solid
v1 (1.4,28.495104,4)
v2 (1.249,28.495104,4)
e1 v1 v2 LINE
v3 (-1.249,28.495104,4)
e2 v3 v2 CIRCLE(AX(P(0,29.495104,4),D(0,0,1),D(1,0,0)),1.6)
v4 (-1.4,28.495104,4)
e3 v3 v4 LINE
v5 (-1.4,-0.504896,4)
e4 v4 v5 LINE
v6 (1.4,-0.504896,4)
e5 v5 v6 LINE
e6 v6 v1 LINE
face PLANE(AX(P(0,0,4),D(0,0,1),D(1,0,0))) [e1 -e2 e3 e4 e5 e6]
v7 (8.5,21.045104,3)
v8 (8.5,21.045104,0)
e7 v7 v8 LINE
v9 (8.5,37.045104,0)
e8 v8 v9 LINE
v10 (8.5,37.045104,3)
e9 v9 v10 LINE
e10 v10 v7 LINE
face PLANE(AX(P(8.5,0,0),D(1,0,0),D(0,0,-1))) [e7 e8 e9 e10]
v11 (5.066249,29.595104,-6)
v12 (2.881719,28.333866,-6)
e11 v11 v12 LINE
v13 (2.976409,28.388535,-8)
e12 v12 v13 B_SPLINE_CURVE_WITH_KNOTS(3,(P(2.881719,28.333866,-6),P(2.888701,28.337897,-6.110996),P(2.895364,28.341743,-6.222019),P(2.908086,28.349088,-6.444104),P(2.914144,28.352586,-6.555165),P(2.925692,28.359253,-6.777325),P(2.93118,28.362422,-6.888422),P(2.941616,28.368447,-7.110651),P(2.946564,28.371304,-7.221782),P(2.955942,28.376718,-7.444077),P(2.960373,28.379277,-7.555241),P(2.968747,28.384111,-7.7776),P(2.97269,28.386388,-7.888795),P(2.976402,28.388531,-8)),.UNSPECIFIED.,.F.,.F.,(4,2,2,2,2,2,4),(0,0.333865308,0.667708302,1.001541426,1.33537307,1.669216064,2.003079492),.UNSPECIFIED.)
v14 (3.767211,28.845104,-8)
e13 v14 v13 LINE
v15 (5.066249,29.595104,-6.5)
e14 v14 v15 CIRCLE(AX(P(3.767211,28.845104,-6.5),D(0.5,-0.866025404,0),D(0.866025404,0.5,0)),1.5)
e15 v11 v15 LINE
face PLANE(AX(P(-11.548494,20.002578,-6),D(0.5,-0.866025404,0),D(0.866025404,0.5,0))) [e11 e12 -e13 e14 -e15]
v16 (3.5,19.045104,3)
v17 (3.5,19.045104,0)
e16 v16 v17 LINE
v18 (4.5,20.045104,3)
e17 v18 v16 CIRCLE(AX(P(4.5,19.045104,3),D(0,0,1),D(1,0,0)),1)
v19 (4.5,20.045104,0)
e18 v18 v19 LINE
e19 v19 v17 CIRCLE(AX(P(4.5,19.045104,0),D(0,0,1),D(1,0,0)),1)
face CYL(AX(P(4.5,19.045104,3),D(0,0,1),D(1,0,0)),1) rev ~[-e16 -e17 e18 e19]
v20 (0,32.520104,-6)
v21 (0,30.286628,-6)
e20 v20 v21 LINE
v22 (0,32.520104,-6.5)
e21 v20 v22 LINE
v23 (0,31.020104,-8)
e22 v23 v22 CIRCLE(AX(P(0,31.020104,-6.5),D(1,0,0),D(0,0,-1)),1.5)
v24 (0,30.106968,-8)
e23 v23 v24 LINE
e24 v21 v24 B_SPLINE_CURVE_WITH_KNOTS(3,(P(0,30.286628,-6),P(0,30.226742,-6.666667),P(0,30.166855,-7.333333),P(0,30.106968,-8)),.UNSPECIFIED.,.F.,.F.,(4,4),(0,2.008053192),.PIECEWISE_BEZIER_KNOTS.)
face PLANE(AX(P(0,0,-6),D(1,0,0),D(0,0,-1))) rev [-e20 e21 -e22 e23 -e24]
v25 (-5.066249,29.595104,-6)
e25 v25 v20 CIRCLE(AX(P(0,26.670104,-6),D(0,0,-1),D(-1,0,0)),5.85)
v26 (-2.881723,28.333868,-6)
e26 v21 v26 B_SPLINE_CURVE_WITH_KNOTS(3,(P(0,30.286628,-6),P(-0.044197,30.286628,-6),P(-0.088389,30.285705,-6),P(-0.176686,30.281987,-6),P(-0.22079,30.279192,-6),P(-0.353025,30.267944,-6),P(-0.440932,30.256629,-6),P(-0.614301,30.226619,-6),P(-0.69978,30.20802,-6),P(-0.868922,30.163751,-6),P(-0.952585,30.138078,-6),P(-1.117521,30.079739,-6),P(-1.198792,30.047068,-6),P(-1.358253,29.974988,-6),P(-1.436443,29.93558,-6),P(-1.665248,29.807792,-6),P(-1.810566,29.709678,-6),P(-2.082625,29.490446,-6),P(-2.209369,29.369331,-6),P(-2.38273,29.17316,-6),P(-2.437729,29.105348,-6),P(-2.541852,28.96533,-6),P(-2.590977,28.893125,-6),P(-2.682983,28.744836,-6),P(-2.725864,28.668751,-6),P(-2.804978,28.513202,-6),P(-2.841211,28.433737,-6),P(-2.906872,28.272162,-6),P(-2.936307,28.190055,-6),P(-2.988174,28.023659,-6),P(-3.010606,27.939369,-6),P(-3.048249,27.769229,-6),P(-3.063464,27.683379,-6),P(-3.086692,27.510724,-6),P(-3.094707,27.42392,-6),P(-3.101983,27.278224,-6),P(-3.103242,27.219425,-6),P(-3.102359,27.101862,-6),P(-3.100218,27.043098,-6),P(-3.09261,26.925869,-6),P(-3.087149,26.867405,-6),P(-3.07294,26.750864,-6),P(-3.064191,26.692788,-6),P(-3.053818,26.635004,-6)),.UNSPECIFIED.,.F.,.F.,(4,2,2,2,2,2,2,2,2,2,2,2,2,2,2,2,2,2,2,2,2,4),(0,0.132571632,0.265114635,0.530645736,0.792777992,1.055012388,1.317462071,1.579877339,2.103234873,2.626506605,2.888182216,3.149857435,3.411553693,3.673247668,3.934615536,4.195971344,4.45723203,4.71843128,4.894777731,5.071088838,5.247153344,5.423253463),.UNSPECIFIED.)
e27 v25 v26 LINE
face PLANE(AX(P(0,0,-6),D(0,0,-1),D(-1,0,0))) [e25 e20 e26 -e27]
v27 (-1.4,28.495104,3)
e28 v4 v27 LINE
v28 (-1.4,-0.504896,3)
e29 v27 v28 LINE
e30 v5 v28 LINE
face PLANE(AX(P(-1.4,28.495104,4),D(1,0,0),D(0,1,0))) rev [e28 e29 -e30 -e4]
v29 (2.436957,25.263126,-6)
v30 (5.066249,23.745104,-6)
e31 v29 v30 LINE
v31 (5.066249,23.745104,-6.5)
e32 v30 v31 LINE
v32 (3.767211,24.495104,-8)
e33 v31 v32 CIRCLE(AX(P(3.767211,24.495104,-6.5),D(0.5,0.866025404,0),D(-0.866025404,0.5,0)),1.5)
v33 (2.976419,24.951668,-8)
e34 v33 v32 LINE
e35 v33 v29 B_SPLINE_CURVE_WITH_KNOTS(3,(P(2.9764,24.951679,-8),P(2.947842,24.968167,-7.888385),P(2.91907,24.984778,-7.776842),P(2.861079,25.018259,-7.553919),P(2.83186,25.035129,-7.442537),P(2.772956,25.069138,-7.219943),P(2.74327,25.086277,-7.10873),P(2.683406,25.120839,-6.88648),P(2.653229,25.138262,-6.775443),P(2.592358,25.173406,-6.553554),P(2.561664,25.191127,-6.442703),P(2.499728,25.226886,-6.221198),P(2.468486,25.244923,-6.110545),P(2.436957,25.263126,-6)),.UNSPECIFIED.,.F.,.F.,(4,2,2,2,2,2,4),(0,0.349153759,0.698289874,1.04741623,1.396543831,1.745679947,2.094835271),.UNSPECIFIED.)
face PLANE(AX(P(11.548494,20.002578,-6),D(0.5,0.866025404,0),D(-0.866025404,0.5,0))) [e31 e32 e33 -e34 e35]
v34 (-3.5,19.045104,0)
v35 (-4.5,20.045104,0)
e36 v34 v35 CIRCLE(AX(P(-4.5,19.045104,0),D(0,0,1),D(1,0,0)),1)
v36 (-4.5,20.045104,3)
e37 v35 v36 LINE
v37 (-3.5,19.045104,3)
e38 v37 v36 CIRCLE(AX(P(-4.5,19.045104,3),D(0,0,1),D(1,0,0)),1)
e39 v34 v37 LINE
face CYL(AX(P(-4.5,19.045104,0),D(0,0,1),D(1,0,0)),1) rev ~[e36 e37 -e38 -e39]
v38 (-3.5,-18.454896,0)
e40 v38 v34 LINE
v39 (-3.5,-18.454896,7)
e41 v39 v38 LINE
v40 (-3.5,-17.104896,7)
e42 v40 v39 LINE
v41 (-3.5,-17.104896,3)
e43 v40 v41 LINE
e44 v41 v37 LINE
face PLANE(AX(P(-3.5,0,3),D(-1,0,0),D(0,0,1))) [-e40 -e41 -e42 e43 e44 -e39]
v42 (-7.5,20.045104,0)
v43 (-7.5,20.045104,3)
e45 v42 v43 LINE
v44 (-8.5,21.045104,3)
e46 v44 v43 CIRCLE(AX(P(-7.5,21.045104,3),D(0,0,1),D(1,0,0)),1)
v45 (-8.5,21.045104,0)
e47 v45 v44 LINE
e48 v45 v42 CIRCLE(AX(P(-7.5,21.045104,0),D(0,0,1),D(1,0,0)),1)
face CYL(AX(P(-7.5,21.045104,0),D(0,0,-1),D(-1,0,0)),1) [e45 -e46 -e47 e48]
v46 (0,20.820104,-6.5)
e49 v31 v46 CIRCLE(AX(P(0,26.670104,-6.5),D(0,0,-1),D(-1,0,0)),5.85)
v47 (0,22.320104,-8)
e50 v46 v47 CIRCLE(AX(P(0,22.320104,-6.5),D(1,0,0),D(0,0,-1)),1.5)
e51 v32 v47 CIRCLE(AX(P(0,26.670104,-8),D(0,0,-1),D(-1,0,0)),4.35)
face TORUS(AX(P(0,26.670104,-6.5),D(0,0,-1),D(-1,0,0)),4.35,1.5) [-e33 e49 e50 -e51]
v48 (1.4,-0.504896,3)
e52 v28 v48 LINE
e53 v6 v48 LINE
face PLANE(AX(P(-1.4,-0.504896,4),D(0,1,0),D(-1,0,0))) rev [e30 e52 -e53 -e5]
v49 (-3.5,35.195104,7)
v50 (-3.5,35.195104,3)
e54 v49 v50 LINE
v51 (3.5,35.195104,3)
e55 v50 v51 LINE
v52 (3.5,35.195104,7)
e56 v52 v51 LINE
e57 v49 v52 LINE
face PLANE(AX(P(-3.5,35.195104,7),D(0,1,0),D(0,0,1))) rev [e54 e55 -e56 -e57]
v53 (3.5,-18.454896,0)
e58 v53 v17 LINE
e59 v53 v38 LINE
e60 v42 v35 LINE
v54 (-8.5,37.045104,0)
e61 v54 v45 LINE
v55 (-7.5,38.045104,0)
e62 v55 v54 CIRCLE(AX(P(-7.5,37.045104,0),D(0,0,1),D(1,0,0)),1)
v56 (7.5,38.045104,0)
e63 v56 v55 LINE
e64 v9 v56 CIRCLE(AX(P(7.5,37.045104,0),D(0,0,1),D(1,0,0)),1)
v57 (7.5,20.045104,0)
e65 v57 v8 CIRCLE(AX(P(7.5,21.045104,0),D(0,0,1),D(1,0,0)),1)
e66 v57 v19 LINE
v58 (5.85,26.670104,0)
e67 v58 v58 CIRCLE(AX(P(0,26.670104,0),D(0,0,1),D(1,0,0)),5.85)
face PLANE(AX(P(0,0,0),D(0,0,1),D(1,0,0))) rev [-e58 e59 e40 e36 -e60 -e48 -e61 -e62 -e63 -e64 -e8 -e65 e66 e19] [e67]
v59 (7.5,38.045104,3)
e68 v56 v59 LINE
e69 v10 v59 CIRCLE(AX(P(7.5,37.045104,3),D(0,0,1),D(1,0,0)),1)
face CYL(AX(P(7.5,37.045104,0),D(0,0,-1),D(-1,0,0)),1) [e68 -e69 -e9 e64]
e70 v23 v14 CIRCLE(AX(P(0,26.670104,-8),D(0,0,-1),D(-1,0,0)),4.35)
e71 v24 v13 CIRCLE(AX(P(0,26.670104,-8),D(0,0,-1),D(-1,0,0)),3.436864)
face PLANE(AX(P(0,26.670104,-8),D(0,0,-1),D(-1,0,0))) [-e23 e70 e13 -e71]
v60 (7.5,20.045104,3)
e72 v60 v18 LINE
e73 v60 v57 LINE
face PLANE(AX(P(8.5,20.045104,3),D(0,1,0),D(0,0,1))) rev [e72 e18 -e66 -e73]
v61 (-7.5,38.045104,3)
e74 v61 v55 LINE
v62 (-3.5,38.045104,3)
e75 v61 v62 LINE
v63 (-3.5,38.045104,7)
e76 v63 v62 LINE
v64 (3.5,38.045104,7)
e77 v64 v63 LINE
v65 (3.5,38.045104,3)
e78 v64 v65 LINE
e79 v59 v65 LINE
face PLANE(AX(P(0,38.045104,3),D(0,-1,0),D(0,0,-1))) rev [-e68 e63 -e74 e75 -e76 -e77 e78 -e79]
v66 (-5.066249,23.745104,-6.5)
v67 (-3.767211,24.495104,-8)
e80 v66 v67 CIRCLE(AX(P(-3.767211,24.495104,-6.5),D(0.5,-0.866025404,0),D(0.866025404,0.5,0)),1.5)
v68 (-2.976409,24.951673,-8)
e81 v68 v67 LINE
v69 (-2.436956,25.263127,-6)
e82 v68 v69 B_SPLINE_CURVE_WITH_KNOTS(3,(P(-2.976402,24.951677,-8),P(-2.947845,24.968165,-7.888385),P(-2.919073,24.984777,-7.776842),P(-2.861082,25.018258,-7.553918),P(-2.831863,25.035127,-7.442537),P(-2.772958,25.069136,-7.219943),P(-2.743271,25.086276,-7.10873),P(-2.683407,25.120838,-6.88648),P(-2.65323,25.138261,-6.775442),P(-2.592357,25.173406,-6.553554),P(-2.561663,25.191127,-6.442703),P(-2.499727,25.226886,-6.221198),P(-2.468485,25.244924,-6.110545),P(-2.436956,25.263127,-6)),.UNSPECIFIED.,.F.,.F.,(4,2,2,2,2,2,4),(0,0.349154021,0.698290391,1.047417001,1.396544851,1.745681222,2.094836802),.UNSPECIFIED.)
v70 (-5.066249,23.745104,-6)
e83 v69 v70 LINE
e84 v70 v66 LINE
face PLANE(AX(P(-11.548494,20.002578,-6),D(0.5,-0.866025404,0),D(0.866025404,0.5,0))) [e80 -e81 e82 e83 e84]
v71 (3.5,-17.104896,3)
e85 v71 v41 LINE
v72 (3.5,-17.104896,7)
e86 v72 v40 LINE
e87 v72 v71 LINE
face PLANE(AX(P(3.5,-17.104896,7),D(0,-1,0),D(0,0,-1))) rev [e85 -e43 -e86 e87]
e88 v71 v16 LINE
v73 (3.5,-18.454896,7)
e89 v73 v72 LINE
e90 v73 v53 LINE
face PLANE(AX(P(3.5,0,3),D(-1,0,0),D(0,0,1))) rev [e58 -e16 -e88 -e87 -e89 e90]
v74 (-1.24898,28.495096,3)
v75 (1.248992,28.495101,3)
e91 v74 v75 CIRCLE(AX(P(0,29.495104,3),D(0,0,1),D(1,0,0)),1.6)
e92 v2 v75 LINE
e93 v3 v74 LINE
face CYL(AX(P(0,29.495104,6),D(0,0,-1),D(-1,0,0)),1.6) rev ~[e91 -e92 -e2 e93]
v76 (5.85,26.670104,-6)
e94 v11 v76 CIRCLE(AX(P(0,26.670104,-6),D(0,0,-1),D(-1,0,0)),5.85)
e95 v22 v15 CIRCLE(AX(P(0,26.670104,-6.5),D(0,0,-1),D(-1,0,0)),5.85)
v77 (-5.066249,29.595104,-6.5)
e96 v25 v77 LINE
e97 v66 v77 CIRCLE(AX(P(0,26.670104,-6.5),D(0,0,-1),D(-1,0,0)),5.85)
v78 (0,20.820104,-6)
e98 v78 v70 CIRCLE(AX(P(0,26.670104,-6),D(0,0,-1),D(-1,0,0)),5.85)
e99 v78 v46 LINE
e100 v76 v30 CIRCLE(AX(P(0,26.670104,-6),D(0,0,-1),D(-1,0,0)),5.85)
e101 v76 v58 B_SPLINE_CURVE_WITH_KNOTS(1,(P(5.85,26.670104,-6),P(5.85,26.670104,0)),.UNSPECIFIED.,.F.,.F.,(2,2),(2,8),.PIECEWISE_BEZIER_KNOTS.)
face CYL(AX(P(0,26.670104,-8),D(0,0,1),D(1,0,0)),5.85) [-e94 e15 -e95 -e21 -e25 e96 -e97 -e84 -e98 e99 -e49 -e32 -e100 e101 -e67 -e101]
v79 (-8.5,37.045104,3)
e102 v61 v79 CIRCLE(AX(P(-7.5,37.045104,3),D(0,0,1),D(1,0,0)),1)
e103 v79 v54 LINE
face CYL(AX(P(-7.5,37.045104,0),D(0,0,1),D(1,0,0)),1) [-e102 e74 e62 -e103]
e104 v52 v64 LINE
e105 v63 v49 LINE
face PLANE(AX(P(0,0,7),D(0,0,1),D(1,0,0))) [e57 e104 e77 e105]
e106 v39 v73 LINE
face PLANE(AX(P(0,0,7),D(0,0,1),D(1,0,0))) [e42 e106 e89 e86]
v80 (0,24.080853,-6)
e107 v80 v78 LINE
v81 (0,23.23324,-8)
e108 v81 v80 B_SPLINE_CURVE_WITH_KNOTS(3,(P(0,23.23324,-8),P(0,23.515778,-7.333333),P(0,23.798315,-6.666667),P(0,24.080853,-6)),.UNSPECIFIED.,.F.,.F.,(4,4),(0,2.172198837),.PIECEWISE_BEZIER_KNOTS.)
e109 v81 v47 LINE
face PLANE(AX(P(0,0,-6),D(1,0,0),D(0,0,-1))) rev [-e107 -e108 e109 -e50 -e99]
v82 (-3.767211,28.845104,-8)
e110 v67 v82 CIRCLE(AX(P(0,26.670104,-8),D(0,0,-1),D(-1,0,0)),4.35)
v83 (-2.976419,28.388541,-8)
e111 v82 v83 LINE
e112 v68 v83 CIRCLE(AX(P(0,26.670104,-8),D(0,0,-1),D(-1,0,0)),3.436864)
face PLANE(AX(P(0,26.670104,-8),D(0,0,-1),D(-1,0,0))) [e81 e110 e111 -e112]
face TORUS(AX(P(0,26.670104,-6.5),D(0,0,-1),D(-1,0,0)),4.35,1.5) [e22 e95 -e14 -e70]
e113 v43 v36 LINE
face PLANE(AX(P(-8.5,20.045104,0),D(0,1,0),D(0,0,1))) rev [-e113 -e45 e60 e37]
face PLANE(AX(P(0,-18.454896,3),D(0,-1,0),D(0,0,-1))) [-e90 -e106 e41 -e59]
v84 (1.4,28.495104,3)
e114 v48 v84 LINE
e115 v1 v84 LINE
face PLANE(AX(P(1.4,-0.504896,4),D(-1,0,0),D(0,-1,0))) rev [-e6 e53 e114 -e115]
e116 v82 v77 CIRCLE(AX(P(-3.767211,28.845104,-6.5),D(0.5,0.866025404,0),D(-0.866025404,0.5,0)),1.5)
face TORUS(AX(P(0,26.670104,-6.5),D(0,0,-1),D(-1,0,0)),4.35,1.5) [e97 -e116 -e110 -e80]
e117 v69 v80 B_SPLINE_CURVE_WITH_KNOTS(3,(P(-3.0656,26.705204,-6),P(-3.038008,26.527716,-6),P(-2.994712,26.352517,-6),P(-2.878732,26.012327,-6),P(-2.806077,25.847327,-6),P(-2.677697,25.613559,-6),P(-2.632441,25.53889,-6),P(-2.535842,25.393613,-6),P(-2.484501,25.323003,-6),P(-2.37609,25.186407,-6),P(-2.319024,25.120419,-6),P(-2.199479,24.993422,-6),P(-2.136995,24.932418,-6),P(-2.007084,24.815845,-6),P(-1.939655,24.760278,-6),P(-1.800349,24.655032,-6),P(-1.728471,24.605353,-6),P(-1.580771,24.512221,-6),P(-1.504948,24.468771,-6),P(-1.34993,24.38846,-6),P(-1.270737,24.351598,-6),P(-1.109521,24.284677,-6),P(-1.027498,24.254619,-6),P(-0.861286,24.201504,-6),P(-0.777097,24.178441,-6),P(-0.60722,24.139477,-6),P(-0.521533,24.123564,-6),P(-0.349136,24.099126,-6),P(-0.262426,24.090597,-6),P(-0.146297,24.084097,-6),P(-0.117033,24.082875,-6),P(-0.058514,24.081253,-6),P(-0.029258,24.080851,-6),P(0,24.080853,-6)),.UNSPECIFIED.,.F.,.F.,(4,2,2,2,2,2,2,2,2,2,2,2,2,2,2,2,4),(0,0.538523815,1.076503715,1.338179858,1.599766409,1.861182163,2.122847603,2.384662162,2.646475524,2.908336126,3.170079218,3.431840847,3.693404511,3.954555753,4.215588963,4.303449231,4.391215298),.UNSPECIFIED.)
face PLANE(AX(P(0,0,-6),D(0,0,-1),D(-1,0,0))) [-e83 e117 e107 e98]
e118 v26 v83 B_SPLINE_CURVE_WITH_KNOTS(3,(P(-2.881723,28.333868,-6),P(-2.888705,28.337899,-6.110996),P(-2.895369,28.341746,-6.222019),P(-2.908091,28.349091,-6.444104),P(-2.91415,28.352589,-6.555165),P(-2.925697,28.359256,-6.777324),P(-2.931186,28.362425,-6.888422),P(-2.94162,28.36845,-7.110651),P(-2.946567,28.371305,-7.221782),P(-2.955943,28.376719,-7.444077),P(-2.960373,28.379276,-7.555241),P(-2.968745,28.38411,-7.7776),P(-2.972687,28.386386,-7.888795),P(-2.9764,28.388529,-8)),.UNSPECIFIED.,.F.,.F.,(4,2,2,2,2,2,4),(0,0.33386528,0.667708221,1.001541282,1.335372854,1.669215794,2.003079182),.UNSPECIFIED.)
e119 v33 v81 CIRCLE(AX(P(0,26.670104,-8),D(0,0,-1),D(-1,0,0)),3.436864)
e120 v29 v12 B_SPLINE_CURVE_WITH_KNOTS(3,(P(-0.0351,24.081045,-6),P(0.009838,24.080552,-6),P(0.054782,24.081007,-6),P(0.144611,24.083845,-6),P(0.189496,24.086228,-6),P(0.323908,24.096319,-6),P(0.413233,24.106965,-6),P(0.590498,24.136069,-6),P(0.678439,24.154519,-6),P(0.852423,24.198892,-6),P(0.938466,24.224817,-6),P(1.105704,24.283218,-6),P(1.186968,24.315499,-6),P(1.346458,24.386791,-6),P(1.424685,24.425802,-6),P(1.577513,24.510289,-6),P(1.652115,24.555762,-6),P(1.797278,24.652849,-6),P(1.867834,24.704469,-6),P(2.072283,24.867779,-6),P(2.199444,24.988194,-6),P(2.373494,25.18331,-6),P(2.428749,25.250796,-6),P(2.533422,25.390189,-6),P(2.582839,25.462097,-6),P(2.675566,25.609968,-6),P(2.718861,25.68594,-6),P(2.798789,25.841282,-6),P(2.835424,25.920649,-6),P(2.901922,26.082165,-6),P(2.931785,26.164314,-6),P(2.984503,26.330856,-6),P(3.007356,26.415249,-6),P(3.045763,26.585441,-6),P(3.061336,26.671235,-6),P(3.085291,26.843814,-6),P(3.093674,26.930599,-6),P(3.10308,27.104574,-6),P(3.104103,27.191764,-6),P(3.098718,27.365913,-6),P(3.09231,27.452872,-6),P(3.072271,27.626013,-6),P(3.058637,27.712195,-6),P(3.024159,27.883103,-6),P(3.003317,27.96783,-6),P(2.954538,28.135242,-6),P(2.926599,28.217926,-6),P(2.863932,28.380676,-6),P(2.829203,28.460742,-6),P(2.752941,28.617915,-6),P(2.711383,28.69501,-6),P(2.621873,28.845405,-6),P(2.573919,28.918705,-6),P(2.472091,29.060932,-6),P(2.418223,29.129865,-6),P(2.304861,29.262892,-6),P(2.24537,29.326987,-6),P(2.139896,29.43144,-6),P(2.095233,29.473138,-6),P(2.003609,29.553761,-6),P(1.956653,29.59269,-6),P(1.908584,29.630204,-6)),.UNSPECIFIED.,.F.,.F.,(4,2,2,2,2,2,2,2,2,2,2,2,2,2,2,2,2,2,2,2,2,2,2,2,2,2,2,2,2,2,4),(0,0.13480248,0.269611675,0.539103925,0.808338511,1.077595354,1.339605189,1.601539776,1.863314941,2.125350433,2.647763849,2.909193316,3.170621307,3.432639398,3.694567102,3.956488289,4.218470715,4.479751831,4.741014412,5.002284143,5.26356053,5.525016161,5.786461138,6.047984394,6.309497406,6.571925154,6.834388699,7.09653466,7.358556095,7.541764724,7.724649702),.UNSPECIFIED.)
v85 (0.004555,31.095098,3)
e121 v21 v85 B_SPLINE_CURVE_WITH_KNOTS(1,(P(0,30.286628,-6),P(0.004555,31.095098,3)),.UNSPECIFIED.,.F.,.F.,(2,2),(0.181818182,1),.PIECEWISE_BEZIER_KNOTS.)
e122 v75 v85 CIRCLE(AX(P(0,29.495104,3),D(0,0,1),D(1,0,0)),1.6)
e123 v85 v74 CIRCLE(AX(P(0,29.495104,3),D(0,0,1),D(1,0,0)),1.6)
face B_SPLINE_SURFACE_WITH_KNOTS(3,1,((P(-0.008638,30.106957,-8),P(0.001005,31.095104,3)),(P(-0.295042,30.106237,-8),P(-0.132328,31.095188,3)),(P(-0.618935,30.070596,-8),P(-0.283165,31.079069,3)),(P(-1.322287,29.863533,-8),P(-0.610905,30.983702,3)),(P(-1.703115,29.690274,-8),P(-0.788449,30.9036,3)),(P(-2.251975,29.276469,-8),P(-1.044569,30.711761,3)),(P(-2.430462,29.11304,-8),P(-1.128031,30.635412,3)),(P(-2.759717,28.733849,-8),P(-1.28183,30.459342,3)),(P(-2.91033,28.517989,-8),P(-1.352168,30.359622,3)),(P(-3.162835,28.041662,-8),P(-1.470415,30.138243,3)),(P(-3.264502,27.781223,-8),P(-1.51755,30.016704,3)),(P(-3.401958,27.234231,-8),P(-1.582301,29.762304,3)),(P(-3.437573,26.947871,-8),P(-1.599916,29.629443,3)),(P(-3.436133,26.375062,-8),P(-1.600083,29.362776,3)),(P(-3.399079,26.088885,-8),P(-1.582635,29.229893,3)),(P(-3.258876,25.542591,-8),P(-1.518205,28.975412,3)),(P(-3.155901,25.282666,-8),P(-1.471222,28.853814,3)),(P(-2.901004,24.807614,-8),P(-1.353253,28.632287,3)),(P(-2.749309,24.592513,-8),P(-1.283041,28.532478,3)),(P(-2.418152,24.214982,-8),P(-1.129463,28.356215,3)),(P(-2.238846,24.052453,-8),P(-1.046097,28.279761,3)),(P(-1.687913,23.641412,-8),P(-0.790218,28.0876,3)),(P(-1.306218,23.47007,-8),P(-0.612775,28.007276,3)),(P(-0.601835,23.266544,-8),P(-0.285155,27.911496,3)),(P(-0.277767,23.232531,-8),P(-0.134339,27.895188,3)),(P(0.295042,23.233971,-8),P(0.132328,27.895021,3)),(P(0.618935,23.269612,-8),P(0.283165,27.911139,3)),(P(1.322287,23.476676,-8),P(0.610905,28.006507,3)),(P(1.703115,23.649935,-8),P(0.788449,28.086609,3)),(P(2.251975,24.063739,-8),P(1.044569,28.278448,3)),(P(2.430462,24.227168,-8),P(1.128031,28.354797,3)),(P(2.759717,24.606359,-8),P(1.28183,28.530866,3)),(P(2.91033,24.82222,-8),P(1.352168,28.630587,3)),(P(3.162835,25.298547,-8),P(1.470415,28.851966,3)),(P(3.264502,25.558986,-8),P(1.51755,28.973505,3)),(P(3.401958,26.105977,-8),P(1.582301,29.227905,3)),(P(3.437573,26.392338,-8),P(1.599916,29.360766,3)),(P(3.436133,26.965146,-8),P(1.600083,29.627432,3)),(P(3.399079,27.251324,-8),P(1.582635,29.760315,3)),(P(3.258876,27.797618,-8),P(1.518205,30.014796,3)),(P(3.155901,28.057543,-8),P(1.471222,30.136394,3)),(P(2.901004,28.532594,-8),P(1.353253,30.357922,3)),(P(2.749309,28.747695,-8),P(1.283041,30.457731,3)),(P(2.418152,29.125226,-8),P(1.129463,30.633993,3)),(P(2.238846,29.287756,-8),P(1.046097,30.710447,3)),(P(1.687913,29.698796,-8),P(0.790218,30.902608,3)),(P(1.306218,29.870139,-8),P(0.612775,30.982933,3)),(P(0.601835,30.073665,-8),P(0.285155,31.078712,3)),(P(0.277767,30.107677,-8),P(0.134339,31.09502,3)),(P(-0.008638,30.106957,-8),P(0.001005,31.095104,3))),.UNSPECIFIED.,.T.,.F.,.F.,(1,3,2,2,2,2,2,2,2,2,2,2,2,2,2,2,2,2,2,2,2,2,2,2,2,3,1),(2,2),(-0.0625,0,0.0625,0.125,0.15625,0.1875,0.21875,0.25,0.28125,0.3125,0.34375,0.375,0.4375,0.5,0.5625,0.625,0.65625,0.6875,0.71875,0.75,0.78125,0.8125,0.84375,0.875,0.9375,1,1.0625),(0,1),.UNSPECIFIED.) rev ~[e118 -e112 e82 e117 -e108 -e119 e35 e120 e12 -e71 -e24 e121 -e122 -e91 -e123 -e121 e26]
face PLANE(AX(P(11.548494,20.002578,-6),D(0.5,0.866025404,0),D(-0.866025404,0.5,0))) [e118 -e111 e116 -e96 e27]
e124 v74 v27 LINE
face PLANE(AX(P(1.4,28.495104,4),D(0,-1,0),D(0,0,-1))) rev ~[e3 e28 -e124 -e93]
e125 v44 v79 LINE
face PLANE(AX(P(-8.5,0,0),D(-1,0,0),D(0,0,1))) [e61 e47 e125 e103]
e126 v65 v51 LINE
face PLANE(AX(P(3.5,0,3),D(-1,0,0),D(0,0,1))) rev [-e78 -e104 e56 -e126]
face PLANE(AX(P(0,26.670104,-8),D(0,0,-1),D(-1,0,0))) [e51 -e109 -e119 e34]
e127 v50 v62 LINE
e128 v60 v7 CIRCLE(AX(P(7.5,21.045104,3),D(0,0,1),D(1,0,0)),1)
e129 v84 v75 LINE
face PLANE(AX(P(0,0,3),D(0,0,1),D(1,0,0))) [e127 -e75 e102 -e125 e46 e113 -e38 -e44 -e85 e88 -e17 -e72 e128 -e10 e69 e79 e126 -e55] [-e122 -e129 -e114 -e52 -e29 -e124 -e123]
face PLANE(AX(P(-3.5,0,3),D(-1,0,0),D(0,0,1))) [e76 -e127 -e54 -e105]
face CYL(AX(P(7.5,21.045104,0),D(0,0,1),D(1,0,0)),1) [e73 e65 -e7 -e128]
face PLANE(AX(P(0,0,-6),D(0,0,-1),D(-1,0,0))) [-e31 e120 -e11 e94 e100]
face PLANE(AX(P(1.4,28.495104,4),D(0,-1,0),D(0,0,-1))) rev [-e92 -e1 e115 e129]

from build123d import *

# Parameters (mm, degrees)
SKETCH1_W           = 7
SKETCH1_H           = 56.5
BOSS_EXTRUDE1_DEPTH = 3
SKETCH2_W           = 2.8
SKETCH2_H           = 29
BOSS_EXTRUDE2_DEPTH = 1
SKETCH3_W           = 7
SKETCH3_H           = 2.85
SKETCH3_H_2         = 1.35
BOSS_EXTRUDE3_DEPTH = 4
SKETCH4_W           = 3
SKETCH4_H           = 18
BOSS_EXTRUDE4_DEPTH = 5
SKETCH5_W           = 3
SKETCH5_H           = 18
BOSS_EXTRUDE5_DEPTH = 5
SKETCH9_R           = 5.85
BOSS_EXTRUDE7_DEPTH = 8
FILLET1_R           = 1.5
FILLET2_R           = 1
SKETCH11_R          = 3.436863838
SKETCH7_R           = 1.6
CUT_EXTRUDE5_START  = -2
CUT_EXTRUDE5_DEPTH  = 2
SKETCH14_R          = 1.6
CUT_EXTRUDE6_DEPTH  = 3


with BuildPart() as part:
    # Sketch1 → Boss-Extrude1 (new body)
    with BuildSketch(Plane.XY):
        with Locations((0, 9.795104227)):
            Rectangle(SKETCH1_W, SKETCH1_H)
    extrude(amount=BOSS_EXTRUDE1_DEPTH)

    # Sketch2 → Boss-Extrude2 (add)
    with BuildSketch(Plane.XY.offset(3)):
        with Locations((0, 13.995104227)):
            Rectangle(SKETCH2_W, SKETCH2_H)
    extrude(amount=BOSS_EXTRUDE2_DEPTH)

    # Sketch3 → Boss-Extrude3 (add)
    with BuildSketch(Plane.XY.offset(3)):
        with Locations((0, 36.620104227)):
            Rectangle(SKETCH3_W, SKETCH3_H)
        with Locations((0, -17.779895773)):
            Rectangle(SKETCH3_W, SKETCH3_H_2)
    extrude(amount=BOSS_EXTRUDE3_DEPTH)

    # Sketch4 → Boss-Extrude4 (add)
    with BuildSketch(Plane.ZY.offset(3.5)):
        with Locations((1.5, 29.045104227)):
            Rectangle(SKETCH4_W, SKETCH4_H)
    extrude(amount=BOSS_EXTRUDE4_DEPTH)

    # Sketch5 → Boss-Extrude5 (add)
    with BuildSketch(Plane(origin=(3.5, 0, 0), x_dir=(0, 0, -1), z_dir=(1, 0, 0))):
        with Locations((-1.5, 29.045104227)):
            Rectangle(SKETCH5_W, SKETCH5_H)
    extrude(amount=BOSS_EXTRUDE5_DEPTH)

    # Sketch9 → Boss-Extrude7 (add)
    with BuildSketch(Plane(origin=(0, 0, 0), x_dir=(-1, 0, 0), z_dir=(0, 0, -1))):
        with Locations(Location((0, 26.670104227, 0), (0, 0, 180))):
            Circle(SKETCH9_R)
    extrude(amount=BOSS_EXTRUDE7_DEPTH)

    # Fillet1
    fillet1_edges = [part.edges().sort_by_distance(p)[0] for p in [
        (-5.85, 26.670104227, -8),
    ]]
    fillet(fillet1_edges, radius=FILLET1_R)

    # Fillet2
    fillet2_edges = [part.edges().sort_by_distance(p)[0] for p in [
        (-3.5, 20.045104227, 1.5),
        (-8.5, 20.045104227, 1.5),
        (-8.5, 38.045104227, 1.5),
        (3.5, 20.045104227, 1.5),
        (8.5, 38.045104227, 1.5),
        (8.5, 20.045104227, 1.5),
    ]]
    fillet(fillet2_edges, radius=FILLET2_R)

    # Sketch11 → Cut-Loft6 section 0
    with BuildSketch(Plane(origin=(0, 0, -8), x_dir=(-1, 0, 0), z_dir=(0, 0, -1))):
        with Locations((0, 26.670104227)):
            Circle(SKETCH11_R)
    # Sketch7 → Cut-Loft6 section 1
    with BuildSketch(Plane.XY.offset(3)):
        with Locations((0, 29.495104227)):
            Circle(SKETCH7_R)
    loft(mode=Mode.SUBTRACT)

    # Sketch10 → Cut-Extrude5 (cut)
    with BuildSketch(Plane(origin=(0, 0, -8), x_dir=(-1, 0, 0), z_dir=(0, 0, -1)).offset(CUT_EXTRUDE5_START)):
        with BuildLine():
            ThreePointArc((5.066248612, 29.595104227), (2.925, 31.736352839), (0, 32.520104227))
            Line((0, 32.520104227), (0, 26.670104227))
            Line((0, 26.670104227), (5.066248612, 29.595104227))
        make_face()
        with BuildLine():
            Line((5.066248612, 23.745104227), (0, 26.670104227))
            Line((0, 26.670104227), (0, 20.820104227))
            ThreePointArc((0, 20.820104227), (2.925, 21.603855615), (5.066248612, 23.745104227))
        make_face()
        with BuildLine():
            Line((-5.066248612, 23.745104227), (0, 26.670104227))
            Line((0, 26.670104227), (-5.066248612, 29.595104227))
            ThreePointArc((-5.066248612, 29.595104227), (-5.85, 26.670104227), (-5.066248612, 23.745104227))
        make_face()
    extrude(amount=CUT_EXTRUDE5_DEPTH, mode=Mode.SUBTRACT)

    # Sketch14 → Cut-Extrude6 (cut)
    with BuildSketch(Plane.XY.offset(3)):
        with Locations((0, 29.495104227)):
            Circle(SKETCH14_R)
    extrude(amount=CUT_EXTRUDE6_DEPTH, mode=Mode.SUBTRACT)


solid = part.part
